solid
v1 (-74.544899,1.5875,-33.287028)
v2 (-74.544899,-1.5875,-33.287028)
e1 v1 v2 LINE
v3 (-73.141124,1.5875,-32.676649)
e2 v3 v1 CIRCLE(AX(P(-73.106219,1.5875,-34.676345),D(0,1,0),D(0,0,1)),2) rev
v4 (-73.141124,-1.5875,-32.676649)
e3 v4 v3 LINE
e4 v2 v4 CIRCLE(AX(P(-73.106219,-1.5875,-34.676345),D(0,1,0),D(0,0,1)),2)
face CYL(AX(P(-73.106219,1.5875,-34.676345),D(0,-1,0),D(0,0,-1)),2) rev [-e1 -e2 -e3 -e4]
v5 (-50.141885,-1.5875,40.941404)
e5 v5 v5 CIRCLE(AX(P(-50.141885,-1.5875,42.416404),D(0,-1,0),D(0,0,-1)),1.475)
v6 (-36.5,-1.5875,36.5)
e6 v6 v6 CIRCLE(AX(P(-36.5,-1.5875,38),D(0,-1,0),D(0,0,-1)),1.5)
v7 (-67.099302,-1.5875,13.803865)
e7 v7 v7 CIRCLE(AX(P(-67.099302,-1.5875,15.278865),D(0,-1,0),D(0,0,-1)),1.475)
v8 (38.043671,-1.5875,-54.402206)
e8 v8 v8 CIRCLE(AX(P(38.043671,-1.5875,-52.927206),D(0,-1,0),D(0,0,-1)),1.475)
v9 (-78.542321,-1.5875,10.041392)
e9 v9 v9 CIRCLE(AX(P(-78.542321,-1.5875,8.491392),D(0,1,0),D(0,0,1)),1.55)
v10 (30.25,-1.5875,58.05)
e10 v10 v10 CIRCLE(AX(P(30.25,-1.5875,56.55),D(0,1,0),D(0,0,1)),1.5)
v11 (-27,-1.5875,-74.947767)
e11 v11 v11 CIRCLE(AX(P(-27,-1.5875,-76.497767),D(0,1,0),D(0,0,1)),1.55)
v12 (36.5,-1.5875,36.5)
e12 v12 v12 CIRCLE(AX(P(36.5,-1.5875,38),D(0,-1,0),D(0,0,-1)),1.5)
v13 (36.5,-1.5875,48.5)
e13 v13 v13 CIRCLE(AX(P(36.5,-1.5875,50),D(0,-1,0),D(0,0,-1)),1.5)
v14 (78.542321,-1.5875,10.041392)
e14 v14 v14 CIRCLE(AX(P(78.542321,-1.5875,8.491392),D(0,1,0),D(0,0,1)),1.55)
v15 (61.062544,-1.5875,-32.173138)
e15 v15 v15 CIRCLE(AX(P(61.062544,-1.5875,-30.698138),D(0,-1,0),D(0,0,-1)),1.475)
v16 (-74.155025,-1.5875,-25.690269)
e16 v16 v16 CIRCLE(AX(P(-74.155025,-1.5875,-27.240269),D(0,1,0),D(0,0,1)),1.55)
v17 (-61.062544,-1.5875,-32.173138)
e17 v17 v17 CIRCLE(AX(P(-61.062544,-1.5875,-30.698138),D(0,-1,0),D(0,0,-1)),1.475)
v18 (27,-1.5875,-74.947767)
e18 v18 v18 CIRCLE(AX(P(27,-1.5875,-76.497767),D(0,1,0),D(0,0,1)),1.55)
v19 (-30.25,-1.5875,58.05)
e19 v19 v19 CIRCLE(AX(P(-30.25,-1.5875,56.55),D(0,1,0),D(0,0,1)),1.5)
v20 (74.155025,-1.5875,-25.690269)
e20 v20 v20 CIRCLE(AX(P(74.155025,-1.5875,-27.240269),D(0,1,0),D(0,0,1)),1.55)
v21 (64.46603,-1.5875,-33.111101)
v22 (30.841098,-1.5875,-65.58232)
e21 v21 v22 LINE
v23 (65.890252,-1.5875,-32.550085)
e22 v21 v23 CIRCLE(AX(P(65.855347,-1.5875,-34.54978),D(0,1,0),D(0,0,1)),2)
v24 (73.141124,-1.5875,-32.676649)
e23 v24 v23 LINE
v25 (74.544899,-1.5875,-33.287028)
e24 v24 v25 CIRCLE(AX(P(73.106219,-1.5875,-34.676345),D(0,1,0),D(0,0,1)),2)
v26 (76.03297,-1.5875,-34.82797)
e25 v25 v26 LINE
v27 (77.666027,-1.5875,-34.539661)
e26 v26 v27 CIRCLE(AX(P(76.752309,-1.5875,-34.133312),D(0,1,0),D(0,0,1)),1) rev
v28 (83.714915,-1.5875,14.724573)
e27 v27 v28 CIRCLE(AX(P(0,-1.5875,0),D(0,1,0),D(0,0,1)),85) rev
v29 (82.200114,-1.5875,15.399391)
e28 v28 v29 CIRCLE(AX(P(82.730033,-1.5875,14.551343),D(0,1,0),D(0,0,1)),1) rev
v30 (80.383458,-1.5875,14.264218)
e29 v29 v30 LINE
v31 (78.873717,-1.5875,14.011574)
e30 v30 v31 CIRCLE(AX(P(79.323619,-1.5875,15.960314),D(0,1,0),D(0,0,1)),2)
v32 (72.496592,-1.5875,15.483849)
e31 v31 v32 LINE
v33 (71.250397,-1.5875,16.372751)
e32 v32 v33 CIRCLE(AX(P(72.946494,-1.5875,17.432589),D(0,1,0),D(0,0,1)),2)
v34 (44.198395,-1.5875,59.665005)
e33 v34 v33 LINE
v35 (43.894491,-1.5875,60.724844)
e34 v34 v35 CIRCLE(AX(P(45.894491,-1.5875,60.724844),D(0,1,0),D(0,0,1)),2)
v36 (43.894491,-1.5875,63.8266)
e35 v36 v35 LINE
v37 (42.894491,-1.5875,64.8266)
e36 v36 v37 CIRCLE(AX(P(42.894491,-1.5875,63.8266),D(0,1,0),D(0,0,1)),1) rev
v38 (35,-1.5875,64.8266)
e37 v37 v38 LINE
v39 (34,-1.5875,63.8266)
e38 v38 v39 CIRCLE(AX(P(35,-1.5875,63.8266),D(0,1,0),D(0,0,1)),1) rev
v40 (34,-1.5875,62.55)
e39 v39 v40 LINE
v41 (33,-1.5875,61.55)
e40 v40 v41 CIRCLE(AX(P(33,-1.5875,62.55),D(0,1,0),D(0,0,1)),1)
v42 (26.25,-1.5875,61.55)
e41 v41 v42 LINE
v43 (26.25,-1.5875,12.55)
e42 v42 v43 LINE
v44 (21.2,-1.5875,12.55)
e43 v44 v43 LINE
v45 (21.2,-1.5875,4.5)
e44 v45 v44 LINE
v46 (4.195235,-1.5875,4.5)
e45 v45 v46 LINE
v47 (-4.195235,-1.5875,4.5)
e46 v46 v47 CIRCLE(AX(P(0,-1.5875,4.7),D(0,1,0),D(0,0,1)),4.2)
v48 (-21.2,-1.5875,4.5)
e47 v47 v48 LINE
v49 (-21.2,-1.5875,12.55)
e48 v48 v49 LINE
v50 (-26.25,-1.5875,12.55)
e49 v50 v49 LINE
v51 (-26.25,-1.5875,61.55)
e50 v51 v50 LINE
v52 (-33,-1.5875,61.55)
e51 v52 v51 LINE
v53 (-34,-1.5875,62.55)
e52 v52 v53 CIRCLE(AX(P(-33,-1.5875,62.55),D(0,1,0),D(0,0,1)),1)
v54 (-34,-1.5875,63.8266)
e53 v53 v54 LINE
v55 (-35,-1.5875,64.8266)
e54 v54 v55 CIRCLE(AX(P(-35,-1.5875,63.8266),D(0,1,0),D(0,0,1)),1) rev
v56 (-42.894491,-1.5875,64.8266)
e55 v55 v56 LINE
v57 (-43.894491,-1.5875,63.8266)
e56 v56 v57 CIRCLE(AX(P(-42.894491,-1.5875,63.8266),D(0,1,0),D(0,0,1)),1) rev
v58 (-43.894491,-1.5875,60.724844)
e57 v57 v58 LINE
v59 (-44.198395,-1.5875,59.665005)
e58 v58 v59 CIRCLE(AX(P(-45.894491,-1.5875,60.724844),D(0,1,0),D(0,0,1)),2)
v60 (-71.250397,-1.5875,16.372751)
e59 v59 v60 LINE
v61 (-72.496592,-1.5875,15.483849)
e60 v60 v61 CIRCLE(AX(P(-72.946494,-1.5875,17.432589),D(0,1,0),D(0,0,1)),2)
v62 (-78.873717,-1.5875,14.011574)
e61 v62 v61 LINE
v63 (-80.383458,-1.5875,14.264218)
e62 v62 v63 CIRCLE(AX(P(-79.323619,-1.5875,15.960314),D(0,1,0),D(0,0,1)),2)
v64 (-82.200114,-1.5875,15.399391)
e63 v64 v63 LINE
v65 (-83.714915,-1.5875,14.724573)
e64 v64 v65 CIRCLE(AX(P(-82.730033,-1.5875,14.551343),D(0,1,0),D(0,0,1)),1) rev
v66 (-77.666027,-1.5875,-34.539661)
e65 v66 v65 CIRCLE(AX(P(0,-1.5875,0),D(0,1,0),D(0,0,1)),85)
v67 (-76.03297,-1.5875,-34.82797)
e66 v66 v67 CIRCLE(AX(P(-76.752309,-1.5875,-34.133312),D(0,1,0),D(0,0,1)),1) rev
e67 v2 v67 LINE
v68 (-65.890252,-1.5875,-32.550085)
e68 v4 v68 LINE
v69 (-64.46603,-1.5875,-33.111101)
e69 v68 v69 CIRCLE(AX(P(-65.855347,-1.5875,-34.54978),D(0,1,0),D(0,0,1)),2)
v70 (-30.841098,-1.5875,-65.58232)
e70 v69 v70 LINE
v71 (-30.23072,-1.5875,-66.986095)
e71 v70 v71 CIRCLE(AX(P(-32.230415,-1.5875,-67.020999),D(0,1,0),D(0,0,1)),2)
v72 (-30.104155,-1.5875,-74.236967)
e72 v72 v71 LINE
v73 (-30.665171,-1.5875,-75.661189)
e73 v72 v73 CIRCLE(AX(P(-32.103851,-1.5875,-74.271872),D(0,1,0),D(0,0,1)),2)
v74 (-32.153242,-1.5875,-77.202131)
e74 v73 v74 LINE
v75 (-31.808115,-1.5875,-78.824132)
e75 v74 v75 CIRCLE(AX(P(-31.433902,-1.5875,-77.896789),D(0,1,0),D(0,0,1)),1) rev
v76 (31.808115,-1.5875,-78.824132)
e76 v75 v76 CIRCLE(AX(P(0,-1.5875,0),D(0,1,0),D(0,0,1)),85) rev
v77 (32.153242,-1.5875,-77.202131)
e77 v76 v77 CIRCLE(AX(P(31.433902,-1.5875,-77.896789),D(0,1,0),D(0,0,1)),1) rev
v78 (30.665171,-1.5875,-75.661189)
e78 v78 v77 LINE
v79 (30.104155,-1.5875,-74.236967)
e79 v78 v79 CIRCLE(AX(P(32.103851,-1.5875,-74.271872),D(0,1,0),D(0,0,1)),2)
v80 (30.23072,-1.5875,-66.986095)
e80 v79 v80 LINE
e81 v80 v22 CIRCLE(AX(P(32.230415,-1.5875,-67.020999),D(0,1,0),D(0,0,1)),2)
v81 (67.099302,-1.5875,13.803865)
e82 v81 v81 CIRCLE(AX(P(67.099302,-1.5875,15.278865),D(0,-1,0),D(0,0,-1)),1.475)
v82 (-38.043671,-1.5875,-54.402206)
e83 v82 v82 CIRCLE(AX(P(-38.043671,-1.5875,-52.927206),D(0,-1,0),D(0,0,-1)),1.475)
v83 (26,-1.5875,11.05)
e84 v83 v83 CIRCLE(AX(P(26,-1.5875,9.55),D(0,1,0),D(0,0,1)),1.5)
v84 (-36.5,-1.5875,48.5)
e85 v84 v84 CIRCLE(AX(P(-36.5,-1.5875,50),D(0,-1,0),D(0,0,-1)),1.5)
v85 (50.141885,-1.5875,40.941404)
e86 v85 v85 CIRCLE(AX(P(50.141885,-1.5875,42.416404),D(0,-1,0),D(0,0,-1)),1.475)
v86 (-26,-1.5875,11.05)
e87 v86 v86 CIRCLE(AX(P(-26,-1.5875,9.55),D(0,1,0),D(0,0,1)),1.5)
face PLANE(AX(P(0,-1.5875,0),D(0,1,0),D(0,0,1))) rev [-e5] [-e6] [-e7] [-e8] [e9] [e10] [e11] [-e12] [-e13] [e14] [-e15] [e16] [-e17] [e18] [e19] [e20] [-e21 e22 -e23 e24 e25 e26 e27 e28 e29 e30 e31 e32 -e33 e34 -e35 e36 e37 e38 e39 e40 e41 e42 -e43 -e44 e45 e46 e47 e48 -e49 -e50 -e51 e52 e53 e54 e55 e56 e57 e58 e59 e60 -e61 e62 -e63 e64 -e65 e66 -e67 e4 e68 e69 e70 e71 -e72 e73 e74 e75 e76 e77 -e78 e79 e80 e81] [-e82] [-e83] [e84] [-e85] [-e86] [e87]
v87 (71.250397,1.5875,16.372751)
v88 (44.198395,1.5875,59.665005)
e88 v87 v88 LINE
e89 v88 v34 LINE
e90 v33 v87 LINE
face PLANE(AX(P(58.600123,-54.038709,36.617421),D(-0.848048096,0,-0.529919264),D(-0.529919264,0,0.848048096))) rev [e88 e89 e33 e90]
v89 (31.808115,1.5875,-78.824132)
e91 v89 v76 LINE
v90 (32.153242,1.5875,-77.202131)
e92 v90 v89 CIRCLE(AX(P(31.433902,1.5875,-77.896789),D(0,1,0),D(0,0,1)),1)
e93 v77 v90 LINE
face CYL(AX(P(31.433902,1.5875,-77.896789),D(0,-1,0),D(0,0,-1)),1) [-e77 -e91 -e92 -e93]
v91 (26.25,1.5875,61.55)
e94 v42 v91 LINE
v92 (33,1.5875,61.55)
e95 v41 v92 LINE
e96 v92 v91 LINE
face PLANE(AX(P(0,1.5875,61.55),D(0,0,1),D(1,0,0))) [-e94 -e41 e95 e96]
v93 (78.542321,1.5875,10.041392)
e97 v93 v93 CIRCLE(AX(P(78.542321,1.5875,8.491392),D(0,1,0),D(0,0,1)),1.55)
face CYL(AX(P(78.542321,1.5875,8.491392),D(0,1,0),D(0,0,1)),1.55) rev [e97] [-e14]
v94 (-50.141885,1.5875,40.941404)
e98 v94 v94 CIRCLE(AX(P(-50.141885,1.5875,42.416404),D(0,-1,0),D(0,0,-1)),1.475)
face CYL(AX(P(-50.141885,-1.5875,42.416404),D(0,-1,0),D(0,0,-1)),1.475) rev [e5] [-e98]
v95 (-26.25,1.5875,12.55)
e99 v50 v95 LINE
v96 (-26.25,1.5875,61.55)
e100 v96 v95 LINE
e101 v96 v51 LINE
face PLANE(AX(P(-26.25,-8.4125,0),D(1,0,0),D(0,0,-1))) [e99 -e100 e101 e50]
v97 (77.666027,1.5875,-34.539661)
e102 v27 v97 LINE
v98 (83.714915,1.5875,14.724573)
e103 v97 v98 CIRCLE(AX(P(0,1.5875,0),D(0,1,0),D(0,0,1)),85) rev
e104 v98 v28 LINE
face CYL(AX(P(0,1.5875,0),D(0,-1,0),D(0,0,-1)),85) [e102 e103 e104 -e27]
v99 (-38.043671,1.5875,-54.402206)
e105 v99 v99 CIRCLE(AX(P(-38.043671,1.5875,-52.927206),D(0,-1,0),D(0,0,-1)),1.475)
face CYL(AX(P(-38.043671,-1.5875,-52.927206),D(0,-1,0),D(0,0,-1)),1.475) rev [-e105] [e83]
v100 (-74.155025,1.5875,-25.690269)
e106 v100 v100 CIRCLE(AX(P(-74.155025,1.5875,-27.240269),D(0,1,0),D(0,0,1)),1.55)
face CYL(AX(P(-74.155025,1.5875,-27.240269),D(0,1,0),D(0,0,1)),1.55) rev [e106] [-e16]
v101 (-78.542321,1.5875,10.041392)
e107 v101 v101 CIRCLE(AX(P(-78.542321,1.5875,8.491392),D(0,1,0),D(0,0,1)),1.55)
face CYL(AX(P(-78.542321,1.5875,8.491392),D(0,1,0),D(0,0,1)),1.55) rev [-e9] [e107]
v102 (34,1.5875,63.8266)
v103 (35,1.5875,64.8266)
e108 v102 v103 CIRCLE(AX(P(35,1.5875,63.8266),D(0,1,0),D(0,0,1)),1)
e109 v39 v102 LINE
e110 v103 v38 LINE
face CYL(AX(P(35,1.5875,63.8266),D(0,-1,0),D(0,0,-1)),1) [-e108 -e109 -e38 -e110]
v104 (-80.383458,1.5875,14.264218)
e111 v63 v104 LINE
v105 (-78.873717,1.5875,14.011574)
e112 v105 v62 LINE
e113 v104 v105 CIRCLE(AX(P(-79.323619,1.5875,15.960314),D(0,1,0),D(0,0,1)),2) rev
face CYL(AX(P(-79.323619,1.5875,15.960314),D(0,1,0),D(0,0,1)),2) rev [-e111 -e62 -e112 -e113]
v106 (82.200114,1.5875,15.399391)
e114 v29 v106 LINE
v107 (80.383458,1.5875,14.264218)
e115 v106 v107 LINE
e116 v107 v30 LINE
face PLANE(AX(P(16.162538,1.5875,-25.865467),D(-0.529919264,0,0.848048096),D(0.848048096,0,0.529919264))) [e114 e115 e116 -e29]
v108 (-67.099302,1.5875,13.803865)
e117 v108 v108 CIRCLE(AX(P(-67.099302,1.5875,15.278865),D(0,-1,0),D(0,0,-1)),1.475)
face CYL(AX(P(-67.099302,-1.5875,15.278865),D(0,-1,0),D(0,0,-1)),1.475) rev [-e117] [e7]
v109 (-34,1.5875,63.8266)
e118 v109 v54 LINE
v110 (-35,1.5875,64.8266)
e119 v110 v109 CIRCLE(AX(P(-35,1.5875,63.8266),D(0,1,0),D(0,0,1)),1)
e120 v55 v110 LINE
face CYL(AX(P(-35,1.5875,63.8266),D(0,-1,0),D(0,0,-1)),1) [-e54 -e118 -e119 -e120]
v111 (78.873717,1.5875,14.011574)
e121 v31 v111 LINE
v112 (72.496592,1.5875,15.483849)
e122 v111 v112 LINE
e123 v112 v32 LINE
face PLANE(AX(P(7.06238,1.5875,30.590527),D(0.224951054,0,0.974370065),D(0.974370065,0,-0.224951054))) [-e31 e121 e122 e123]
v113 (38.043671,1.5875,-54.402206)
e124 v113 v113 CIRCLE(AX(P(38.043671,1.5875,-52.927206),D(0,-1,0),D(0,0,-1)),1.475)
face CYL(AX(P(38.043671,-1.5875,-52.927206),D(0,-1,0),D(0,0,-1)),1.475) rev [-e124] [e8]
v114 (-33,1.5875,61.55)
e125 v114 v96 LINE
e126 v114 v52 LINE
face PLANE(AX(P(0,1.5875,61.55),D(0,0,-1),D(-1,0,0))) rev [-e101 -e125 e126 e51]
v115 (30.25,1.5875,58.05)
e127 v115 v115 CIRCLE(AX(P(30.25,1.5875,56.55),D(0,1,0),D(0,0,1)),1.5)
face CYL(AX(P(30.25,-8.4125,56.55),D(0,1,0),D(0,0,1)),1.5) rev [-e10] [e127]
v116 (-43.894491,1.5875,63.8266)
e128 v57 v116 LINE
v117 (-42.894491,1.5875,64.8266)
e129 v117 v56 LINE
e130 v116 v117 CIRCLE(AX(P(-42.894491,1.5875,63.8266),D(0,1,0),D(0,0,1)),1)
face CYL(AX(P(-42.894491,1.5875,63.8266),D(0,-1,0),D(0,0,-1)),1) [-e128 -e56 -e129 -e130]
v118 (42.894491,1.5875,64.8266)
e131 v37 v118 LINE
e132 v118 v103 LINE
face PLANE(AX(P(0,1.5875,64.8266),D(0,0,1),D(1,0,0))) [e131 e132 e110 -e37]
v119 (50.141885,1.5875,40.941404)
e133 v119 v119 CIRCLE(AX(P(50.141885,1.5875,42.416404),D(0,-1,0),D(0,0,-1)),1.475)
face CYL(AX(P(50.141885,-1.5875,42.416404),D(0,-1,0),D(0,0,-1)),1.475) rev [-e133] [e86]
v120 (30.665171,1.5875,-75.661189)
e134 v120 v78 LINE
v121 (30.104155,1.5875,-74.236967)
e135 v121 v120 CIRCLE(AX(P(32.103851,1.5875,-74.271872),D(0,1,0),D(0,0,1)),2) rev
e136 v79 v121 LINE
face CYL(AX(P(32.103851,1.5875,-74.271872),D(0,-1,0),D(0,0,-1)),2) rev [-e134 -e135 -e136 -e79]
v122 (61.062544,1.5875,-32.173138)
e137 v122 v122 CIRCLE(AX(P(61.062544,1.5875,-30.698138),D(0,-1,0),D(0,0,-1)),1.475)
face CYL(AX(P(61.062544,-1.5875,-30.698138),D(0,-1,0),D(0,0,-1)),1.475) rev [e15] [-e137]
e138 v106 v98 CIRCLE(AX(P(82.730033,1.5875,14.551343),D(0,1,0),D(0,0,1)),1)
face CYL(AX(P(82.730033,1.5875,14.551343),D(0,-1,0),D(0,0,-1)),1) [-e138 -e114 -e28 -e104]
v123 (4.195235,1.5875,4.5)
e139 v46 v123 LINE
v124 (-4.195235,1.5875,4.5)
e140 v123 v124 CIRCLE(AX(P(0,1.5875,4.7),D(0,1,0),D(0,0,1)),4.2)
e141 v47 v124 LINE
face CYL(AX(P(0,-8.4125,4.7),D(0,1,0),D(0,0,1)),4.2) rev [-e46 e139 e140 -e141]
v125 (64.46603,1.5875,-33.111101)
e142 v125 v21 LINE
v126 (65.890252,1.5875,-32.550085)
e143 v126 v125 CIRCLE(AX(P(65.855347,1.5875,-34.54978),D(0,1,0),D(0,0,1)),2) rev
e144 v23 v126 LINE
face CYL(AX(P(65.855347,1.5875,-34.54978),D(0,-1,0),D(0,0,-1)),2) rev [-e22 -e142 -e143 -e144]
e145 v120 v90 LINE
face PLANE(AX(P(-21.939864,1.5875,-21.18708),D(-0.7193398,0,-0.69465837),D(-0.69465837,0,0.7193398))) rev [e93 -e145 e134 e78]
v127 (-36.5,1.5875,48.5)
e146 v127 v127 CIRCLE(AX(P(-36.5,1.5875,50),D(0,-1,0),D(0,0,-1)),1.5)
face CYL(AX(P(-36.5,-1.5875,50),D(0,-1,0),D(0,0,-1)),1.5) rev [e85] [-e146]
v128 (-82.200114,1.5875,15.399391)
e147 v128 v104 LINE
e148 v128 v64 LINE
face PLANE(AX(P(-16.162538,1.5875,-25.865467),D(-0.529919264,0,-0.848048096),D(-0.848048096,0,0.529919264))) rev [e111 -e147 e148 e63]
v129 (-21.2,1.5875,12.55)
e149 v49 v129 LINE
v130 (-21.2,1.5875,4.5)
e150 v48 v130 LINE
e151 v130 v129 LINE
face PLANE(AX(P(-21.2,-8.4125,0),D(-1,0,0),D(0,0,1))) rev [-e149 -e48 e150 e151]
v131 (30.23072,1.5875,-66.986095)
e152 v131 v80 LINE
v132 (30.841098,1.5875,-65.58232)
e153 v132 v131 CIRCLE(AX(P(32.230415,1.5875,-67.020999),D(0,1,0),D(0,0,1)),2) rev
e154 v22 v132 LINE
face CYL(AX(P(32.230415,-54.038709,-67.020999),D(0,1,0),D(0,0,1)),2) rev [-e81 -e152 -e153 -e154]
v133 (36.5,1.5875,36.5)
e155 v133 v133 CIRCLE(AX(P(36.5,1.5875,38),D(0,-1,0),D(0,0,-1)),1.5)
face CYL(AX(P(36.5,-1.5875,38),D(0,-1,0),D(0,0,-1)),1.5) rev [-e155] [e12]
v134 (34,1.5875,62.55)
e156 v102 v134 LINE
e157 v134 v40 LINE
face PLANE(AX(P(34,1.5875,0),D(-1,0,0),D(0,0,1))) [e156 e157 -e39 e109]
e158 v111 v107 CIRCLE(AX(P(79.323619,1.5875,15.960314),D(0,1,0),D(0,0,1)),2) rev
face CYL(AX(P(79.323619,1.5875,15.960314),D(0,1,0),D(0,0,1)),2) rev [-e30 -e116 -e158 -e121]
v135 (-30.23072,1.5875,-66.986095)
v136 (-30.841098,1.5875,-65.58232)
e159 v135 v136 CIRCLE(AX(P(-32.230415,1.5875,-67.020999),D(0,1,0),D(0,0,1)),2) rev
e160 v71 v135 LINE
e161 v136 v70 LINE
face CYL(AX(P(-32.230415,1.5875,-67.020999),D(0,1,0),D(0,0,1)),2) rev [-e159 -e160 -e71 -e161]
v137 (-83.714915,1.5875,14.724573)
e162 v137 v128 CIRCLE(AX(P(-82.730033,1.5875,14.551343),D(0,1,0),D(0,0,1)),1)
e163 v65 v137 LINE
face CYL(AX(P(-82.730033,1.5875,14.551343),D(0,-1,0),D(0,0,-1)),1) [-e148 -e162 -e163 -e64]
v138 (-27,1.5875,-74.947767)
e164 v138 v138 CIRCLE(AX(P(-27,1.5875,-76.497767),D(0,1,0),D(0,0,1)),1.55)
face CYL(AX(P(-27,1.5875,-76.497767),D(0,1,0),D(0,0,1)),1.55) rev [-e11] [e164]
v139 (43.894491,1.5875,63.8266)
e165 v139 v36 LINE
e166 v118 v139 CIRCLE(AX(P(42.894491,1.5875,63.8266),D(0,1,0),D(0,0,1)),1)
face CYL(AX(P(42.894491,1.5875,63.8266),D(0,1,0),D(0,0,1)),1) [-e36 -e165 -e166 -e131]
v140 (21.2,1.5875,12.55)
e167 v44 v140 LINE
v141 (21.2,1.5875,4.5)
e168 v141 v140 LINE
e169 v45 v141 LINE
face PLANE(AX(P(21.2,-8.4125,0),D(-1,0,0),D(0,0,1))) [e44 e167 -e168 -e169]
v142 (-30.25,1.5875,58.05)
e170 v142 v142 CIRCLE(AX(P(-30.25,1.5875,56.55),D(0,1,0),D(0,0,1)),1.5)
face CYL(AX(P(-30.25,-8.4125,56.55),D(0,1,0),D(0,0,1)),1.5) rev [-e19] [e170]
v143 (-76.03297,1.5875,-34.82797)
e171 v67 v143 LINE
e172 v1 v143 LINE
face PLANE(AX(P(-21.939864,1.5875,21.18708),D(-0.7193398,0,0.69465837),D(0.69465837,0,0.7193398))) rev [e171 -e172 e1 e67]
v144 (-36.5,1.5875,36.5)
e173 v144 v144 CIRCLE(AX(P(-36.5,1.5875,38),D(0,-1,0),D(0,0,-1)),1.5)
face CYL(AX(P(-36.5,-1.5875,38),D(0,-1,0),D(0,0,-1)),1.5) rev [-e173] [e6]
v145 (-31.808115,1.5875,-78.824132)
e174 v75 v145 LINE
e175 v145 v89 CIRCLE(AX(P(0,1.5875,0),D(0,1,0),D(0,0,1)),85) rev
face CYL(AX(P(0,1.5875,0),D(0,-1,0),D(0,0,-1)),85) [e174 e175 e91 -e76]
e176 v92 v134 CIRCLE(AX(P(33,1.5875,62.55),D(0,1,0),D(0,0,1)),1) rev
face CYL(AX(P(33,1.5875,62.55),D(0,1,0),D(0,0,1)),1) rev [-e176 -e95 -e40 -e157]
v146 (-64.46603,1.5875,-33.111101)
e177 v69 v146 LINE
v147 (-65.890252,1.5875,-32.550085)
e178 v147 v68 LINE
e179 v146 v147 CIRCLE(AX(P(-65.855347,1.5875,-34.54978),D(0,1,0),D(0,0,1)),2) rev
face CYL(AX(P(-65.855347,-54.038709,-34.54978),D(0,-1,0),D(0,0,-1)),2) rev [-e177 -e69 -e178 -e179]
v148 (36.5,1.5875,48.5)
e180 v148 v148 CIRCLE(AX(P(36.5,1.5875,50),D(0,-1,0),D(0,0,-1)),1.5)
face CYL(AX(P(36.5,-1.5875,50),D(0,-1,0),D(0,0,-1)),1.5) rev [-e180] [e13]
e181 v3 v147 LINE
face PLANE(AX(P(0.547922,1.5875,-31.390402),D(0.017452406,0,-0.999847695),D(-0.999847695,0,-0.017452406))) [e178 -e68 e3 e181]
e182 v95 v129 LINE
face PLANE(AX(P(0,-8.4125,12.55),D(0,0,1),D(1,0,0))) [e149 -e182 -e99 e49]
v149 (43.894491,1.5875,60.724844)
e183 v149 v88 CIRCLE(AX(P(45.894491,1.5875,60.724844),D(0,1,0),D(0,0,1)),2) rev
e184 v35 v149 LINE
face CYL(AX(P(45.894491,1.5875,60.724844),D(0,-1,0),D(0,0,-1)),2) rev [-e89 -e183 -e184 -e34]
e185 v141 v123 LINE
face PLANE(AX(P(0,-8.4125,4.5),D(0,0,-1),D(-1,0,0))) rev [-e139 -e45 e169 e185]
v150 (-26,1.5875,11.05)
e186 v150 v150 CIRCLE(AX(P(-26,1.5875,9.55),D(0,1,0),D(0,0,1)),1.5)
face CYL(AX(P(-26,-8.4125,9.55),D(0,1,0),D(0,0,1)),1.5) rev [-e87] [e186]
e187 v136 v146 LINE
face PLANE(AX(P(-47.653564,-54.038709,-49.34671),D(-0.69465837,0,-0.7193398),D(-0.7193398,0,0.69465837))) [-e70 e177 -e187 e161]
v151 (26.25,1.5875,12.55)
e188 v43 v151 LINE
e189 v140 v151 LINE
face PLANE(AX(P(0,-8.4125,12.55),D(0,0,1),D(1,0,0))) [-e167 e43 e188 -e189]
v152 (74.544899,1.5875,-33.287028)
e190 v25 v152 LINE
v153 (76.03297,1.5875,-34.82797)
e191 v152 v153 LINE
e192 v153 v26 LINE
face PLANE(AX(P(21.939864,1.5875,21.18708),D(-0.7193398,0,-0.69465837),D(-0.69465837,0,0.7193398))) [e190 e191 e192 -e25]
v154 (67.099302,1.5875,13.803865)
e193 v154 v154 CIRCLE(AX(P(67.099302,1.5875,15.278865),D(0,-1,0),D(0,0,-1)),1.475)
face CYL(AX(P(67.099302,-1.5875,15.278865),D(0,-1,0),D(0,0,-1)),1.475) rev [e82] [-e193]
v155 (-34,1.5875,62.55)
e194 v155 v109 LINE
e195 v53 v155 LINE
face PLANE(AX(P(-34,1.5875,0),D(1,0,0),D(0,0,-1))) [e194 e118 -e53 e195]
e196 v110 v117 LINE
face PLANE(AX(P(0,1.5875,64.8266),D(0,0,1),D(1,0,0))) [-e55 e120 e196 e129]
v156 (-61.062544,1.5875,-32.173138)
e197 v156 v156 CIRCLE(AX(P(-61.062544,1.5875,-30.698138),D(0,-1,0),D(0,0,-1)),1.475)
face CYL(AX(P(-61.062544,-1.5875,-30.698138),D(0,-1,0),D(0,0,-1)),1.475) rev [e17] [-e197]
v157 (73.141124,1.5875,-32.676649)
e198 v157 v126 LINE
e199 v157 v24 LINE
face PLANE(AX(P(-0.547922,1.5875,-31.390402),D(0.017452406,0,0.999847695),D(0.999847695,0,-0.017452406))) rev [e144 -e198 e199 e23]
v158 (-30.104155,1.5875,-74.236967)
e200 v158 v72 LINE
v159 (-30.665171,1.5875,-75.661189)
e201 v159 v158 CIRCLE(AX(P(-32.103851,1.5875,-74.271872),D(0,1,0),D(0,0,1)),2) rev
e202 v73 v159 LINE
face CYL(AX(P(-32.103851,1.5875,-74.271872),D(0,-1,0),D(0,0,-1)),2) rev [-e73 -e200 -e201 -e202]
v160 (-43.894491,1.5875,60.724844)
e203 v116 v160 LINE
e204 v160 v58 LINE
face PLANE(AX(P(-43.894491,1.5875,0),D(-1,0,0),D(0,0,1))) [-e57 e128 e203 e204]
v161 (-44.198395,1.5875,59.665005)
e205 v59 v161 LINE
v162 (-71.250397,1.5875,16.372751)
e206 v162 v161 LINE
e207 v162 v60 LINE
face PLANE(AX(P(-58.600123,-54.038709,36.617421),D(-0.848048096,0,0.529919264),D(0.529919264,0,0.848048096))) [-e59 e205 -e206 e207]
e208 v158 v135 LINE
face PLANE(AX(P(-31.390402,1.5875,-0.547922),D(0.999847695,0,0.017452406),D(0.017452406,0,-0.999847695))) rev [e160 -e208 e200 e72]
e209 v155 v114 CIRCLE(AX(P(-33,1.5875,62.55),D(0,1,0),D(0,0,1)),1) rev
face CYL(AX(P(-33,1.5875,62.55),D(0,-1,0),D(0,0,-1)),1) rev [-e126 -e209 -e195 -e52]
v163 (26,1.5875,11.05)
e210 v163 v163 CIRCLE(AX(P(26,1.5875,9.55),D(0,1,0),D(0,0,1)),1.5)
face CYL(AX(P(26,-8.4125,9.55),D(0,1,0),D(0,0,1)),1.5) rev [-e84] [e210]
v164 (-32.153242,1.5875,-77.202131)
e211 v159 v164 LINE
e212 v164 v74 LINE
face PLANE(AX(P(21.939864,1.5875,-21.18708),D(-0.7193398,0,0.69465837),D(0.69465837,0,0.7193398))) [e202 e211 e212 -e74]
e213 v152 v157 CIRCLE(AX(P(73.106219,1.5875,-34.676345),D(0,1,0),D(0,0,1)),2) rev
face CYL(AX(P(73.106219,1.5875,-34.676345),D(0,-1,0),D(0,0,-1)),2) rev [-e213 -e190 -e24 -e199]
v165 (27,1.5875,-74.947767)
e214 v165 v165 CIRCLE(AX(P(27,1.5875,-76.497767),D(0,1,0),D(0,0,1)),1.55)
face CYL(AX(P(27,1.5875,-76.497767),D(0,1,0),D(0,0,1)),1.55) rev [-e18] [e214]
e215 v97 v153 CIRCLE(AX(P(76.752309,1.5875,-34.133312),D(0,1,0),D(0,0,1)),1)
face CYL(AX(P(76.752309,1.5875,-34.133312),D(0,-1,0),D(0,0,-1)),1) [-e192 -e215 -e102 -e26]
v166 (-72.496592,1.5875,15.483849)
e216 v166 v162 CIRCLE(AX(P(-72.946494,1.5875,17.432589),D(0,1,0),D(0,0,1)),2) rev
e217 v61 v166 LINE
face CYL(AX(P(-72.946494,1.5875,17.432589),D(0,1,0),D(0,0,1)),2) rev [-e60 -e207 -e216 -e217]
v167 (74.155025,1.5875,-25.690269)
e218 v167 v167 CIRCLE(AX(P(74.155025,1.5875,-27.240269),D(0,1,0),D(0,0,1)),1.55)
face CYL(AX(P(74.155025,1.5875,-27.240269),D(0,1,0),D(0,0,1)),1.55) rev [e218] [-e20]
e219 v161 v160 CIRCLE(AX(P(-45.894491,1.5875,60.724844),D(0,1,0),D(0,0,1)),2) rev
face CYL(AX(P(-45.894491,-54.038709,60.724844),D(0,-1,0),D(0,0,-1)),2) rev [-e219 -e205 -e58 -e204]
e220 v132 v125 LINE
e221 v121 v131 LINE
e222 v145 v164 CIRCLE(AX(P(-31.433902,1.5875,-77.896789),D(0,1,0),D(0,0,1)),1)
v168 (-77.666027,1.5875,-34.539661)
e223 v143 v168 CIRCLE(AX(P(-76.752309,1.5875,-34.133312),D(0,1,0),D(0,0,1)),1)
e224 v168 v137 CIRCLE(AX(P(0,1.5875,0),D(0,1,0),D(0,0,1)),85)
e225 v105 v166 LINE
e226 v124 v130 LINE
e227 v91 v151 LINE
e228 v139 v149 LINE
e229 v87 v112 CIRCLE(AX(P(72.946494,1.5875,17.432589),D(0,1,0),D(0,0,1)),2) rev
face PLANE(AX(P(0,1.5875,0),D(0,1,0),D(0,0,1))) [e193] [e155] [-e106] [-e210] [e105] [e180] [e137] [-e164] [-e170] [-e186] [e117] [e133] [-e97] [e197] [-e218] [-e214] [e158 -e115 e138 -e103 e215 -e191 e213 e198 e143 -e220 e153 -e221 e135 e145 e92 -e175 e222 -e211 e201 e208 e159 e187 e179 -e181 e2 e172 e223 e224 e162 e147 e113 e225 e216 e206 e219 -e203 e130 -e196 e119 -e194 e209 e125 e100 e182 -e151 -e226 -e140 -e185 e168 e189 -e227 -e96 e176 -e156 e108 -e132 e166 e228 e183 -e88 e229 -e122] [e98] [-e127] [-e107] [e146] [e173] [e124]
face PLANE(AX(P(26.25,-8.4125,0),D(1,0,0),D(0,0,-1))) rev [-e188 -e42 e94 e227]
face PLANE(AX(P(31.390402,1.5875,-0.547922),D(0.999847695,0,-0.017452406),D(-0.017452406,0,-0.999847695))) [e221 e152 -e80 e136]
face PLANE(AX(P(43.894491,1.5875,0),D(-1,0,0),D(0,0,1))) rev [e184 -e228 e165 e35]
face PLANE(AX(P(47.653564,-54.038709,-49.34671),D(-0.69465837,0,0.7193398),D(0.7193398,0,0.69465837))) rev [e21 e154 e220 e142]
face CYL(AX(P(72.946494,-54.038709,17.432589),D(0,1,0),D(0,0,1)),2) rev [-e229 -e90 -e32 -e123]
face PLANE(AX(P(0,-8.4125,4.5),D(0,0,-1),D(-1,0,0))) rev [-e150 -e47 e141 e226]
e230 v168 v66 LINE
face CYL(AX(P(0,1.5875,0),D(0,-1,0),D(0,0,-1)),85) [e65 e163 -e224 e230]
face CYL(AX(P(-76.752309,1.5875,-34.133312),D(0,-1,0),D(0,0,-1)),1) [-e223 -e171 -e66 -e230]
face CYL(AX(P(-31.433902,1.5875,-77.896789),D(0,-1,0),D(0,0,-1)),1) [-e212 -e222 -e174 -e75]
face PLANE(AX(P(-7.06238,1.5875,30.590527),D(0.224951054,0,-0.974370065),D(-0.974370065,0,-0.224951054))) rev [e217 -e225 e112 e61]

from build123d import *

# Parameters (mm, degrees)
BOSS_EXTRUDE4_DEPTH  = 1.5875
M3_CLEARANCE_HOLE3_D = 3
M3_CLEARANCE_HOLE1_D = 3.1
M3_CLEARANCE_HOLE4_D = 2.95
M3_CLEARANCE_HOLE2_D = 3.1
BOSS_EXTRUDE6_DEPTH  = 3.175
FILLET1_R            = 2
FILLET3_R            = 1
FILLET6_R            = 0.5
CUT_EXTRUDE4_DEPTH   = 10
SKETCH29_R           = 1.5
CUT_EXTRUDE5_DEPTH   = 10
SKETCH31_R           = 1.5
CUT_EXTRUDE7_DEPTH   = 10


with BuildPart() as part:
    # Sketch1 → Boss-Extrude4 (new, symmetric)
    with BuildSketch(Plane(origin=(0, 0, 0), x_dir=(1, 0, 0), z_dir=(0, 1, 0))):
        with BuildLine():
            Line((-62.799553621, 32.496136604), (-73.969425011, 32.691107434))
            Line((-73.969425011, 32.691107434), (-77.053684287, 35.88495141))
            ThreePointArc((-77.053684287, 35.88495141), (-84.36642289, 10.358894189), (-83.446216027, -16.178041625))
            Line((-83.446216027, -16.178041625), (-79.680911643, -13.825218315))
            Line((-79.680911643, -13.825218315), (-69.484649137, -16.179210996))
            Line((-69.484649137, -16.179210996), (-43.894490772, -57.132025032))
            Line((-43.894490772, -57.132025032), (-43.894490772, -64.826600275))
            Line((-43.894490772, -64.826600275), (-43.094490772, -64.826600275))
            Line((-43.094490772, -64.826600275), (-34, -64.826600275))
            Line((-34, -64.826600275), (-34, -62.55))
            Line((-34, -62.55), (-34, -61.55))
            Line((-34, -61.55), (-20, -61.55))
            Line((-20, -61.55), (-19.859459165, -62.55))
            Line((-19.859459165, -62.55), (19.859459165, -62.55))
            Line((19.859459165, -62.55), (20, -61.55))
            Line((20, -61.55), (34, -61.55))
            Line((34, -61.55), (34, -62.55))
            Line((34, -62.55), (34, -64.826600275))
            Line((34, -64.826600275), (43.094490772, -64.826600275))
            Line((43.094490772, -64.826600275), (43.894490772, -64.826600275))
            Line((43.894490772, -64.826600275), (43.894490772, -57.132025032))
            Line((43.894490772, -57.132025032), (69.484649137, -16.179210996))
            Line((69.484649137, -16.179210996), (79.680911643, -13.825218315))
            Line((79.680911643, -13.825218315), (83.446216027, -16.178041625))
            ThreePointArc((83.446216027, -16.178041625), (84.610662337, -8.126242604), (85, 0))
            ThreePointArc((85, 0), (82.98964744, 18.377116688), (77.053684287, 35.88495141))
            Line((77.053684287, 35.88495141), (73.969425011, 32.691107434))
            Line((73.969425011, 32.691107434), (62.799553621, 32.496136604))
            Line((62.799553621, 32.496136604), (30.284668021, 63.895396642))
            Line((30.284668021, 63.895396642), (30.089697191, 75.065268032))
            Line((30.089697191, 75.065268032), (33.173956467, 78.259112008))
            ThreePointArc((33.173956467, 78.259112008), (0, 85), (-33.173956467, 78.259112008))
            Line((-33.173956467, 78.259112008), (-30.089697191, 75.065268032))
            Line((-30.089697191, 75.065268032), (-30.284668021, 63.895396642))
            Line((-30.284668021, 63.895396642), (-62.799553621, 32.496136604))
        make_face()
    extrude(amount=BOSS_EXTRUDE4_DEPTH, both=True)

    # M3 Clearance Hole3 (through all)
    with Locations(Plane(origin=(0, -1.5875, 0), x_dir=(-1, 0, 0), z_dir=(0, -1, 0))):
        with Locations((36.5, -50), (36.5, -38), (-36.5, -50), (-36.5, -38)):
            Hole(M3_CLEARANCE_HOLE3_D / 2)

    # M3 Clearance Hole1 (through all)
    with Locations(Plane(origin=(0, 1.5875, 0), x_dir=(1, 0, 0), z_dir=(0, 1, 0))):
        with Locations((-78.542321426, -8.49139241), (78.542321426, -8.49139241), (74.155025063, 27.240269049), (-74.155025063, 27.240269049)):
            Hole(M3_CLEARANCE_HOLE1_D / 2)

    # M3 Clearance Hole4 (through all)
    with Locations(Plane(origin=(0, -1.5875, 0), x_dir=(-1, 0, 0), z_dir=(0, -1, 0))):
        with Locations((-67.099301622, -15.278865202), (-50.141885166, -42.416404279), (-61.062544382, 30.698137949), (-38.043670771, 52.927205804), (50.141885166, -42.416404279), (67.099301622, -15.278865202), (38.043670771, 52.927205804), (61.062544382, 30.698137949)):
            Hole(M3_CLEARANCE_HOLE4_D / 2)

    # M3 Clearance Hole2 (through all)
    with Locations(Plane(origin=(0, 1.5875, 0), x_dir=(1, 0, 0), z_dir=(0, 1, 0))):
        with Locations((27, 76.497766718), (-27, 76.497766718)):
            Hole(M3_CLEARANCE_HOLE2_D / 2)

    # Sketch22 → Boss-Extrude6 (add)
    with BuildSketch(Plane(origin=(0, 1.5875, 0), x_dir=(1, 0, 0), z_dir=(0, 1, 0))):
        Polygon((65.061950694, 32.535626892), (30.245177733, 66.157793715), (30.284668021, 63.895396642), (62.799553621, 32.496136604), align=None)
        Polygon((-30.284668021, 63.895396642), (-30.245177733, 66.157793715), (-65.061950694, 32.535626892), (-62.799553621, 32.496136604), align=None)
        Polygon((43.894490772, -60.151352895), (71.689396914, -15.670204865), (69.484649137, -16.179210996), (43.894490772, -57.132025032), align=None)
        Polygon((-69.484649137, -16.179210996), (-71.689396914, -15.670204865), (-43.894490772, -60.151352895), (-43.894490772, -57.132025032), align=None)
    extrude(amount=-BOSS_EXTRUDE6_DEPTH)

    # Fillet1
    fillet1_edges = [part.edges().sort_by_distance(p)[0] for p in [
        (-30.245177733, 0.79375, -66.157793715),
        (-65.061950694, 0.79375, -32.535626892),
        (-71.689396914, 0.79375, 15.670204865),
        (-43.894490772, 0.79375, 60.151352895),
        (43.894490772, -0.79375, 60.151352895),
        (71.689396914, -0.79375, 15.670204865),
        (65.061950694, 0.79375, -32.535626892),
        (30.245177733, -0.79375, -66.157793715),
        (30.089697191, -0.79375, -75.065268032),
        (73.969425011, -0.79375, -32.691107434),
        (79.680911643, -0.79375, 13.825218315),
        (-79.680911643, -0.79375, 13.825218315),
        (-73.969425011, -0.79375, -32.691107434),
        (-30.089697191, -0.79375, -75.065268032),
    ]]
    fillet(fillet1_edges, radius=FILLET1_R)

    # Fillet3
    fillet3_edges = [part.edges().sort_by_distance(p)[0] for p in [
        (33.173956467, -0.79375, -78.259112008),
        (77.053684287, 0.79375, -35.88495141),
        (83.446216027, -0.79375, 16.178041625),
        (43.894490772, -0.79375, 64.826600275),
        (34, 0.79375, 64.826600275),
        (34, -0.79375, 61.55),
        (-34, -0.79375, 61.55),
        (-34, 0.79375, 64.826600275),
        (-43.894490772, -0.79375, 64.826600275),
        (-83.446216027, -0.79375, 16.178041625),
        (-77.053684287, -0.79375, -35.88495141),
        (-33.173956467, -0.79375, -78.259112008),
    ]]
    fillet(fillet3_edges, radius=FILLET3_R - 0.0001)  # a hair under: the kernel refuses the full size

    # Fillet6
    fillet6_edges = [part.edges().sort_by_distance(p)[0] for p in [
        (20, -0.79375, 61.55),
        (19.859459165, -0.79375, 62.55),
        (-19.859459165, 0.79375, 62.55),
        (-20, 0.79375, 61.55),
    ]]
    fillet(fillet6_edges, radius=FILLET6_R)

    # Sketch28 → Cut-Extrude4 (cut)
    with BuildSketch(Plane(origin=(0, 1.5875, 0), x_dir=(1, 0, 0), z_dir=(0, 1, 0))):
        with BuildLine():
            Line((-26.25, -12.55), (-26.25, -62.55))
            Line((-26.25, -62.55), (26.25, -62.55))
            Line((26.25, -62.55), (26.25, -12.55))
            Line((26.25, -12.55), (21.2, -12.55))
            Line((21.2, -12.55), (21.2, -4.5))
            Line((21.2, -4.5), (4.195235393, -4.5))
            ThreePointArc((4.195235393, -4.5), (0, -0.5), (-4.195235393, -4.5))
            Line((-4.195235393, -4.5), (-21.2, -4.5))
            Line((-21.2, -4.5), (-21.2, -12.55))
            Line((-21.2, -12.55), (-26.25, -12.55))
        make_face()
    extrude(amount=-CUT_EXTRUDE4_DEPTH, mode=Mode.SUBTRACT)

    # Sketch29 → Cut-Extrude5 (cut)
    with BuildSketch(Plane(origin=(0, 1.5875, 0), x_dir=(1, 0, 0), z_dir=(0, 1, 0))):
        with Locations(Location((30.25, -56.55, 0), (0, 0, 270))):
            Circle(SKETCH29_R)
        with Locations(Location((-30.25, -56.55, 0), (0, 0, 270))):
            Circle(SKETCH29_R)
    extrude(amount=-CUT_EXTRUDE5_DEPTH, mode=Mode.SUBTRACT)

    # Sketch31 → Cut-Extrude7 (cut)
    with BuildSketch(Plane(origin=(0, 1.5875, 0), x_dir=(1, 0, 0), z_dir=(0, 1, 0))):
        with Locations(Location((-26, -9.55, 0), (0, 0, 270))):
            Circle(SKETCH31_R)
        with Locations(Location((26, -9.55, 0), (0, 0, 270))):
            Circle(SKETCH31_R)
    extrude(amount=-CUT_EXTRUDE7_DEPTH, mode=Mode.SUBTRACT)


solid = part.part
